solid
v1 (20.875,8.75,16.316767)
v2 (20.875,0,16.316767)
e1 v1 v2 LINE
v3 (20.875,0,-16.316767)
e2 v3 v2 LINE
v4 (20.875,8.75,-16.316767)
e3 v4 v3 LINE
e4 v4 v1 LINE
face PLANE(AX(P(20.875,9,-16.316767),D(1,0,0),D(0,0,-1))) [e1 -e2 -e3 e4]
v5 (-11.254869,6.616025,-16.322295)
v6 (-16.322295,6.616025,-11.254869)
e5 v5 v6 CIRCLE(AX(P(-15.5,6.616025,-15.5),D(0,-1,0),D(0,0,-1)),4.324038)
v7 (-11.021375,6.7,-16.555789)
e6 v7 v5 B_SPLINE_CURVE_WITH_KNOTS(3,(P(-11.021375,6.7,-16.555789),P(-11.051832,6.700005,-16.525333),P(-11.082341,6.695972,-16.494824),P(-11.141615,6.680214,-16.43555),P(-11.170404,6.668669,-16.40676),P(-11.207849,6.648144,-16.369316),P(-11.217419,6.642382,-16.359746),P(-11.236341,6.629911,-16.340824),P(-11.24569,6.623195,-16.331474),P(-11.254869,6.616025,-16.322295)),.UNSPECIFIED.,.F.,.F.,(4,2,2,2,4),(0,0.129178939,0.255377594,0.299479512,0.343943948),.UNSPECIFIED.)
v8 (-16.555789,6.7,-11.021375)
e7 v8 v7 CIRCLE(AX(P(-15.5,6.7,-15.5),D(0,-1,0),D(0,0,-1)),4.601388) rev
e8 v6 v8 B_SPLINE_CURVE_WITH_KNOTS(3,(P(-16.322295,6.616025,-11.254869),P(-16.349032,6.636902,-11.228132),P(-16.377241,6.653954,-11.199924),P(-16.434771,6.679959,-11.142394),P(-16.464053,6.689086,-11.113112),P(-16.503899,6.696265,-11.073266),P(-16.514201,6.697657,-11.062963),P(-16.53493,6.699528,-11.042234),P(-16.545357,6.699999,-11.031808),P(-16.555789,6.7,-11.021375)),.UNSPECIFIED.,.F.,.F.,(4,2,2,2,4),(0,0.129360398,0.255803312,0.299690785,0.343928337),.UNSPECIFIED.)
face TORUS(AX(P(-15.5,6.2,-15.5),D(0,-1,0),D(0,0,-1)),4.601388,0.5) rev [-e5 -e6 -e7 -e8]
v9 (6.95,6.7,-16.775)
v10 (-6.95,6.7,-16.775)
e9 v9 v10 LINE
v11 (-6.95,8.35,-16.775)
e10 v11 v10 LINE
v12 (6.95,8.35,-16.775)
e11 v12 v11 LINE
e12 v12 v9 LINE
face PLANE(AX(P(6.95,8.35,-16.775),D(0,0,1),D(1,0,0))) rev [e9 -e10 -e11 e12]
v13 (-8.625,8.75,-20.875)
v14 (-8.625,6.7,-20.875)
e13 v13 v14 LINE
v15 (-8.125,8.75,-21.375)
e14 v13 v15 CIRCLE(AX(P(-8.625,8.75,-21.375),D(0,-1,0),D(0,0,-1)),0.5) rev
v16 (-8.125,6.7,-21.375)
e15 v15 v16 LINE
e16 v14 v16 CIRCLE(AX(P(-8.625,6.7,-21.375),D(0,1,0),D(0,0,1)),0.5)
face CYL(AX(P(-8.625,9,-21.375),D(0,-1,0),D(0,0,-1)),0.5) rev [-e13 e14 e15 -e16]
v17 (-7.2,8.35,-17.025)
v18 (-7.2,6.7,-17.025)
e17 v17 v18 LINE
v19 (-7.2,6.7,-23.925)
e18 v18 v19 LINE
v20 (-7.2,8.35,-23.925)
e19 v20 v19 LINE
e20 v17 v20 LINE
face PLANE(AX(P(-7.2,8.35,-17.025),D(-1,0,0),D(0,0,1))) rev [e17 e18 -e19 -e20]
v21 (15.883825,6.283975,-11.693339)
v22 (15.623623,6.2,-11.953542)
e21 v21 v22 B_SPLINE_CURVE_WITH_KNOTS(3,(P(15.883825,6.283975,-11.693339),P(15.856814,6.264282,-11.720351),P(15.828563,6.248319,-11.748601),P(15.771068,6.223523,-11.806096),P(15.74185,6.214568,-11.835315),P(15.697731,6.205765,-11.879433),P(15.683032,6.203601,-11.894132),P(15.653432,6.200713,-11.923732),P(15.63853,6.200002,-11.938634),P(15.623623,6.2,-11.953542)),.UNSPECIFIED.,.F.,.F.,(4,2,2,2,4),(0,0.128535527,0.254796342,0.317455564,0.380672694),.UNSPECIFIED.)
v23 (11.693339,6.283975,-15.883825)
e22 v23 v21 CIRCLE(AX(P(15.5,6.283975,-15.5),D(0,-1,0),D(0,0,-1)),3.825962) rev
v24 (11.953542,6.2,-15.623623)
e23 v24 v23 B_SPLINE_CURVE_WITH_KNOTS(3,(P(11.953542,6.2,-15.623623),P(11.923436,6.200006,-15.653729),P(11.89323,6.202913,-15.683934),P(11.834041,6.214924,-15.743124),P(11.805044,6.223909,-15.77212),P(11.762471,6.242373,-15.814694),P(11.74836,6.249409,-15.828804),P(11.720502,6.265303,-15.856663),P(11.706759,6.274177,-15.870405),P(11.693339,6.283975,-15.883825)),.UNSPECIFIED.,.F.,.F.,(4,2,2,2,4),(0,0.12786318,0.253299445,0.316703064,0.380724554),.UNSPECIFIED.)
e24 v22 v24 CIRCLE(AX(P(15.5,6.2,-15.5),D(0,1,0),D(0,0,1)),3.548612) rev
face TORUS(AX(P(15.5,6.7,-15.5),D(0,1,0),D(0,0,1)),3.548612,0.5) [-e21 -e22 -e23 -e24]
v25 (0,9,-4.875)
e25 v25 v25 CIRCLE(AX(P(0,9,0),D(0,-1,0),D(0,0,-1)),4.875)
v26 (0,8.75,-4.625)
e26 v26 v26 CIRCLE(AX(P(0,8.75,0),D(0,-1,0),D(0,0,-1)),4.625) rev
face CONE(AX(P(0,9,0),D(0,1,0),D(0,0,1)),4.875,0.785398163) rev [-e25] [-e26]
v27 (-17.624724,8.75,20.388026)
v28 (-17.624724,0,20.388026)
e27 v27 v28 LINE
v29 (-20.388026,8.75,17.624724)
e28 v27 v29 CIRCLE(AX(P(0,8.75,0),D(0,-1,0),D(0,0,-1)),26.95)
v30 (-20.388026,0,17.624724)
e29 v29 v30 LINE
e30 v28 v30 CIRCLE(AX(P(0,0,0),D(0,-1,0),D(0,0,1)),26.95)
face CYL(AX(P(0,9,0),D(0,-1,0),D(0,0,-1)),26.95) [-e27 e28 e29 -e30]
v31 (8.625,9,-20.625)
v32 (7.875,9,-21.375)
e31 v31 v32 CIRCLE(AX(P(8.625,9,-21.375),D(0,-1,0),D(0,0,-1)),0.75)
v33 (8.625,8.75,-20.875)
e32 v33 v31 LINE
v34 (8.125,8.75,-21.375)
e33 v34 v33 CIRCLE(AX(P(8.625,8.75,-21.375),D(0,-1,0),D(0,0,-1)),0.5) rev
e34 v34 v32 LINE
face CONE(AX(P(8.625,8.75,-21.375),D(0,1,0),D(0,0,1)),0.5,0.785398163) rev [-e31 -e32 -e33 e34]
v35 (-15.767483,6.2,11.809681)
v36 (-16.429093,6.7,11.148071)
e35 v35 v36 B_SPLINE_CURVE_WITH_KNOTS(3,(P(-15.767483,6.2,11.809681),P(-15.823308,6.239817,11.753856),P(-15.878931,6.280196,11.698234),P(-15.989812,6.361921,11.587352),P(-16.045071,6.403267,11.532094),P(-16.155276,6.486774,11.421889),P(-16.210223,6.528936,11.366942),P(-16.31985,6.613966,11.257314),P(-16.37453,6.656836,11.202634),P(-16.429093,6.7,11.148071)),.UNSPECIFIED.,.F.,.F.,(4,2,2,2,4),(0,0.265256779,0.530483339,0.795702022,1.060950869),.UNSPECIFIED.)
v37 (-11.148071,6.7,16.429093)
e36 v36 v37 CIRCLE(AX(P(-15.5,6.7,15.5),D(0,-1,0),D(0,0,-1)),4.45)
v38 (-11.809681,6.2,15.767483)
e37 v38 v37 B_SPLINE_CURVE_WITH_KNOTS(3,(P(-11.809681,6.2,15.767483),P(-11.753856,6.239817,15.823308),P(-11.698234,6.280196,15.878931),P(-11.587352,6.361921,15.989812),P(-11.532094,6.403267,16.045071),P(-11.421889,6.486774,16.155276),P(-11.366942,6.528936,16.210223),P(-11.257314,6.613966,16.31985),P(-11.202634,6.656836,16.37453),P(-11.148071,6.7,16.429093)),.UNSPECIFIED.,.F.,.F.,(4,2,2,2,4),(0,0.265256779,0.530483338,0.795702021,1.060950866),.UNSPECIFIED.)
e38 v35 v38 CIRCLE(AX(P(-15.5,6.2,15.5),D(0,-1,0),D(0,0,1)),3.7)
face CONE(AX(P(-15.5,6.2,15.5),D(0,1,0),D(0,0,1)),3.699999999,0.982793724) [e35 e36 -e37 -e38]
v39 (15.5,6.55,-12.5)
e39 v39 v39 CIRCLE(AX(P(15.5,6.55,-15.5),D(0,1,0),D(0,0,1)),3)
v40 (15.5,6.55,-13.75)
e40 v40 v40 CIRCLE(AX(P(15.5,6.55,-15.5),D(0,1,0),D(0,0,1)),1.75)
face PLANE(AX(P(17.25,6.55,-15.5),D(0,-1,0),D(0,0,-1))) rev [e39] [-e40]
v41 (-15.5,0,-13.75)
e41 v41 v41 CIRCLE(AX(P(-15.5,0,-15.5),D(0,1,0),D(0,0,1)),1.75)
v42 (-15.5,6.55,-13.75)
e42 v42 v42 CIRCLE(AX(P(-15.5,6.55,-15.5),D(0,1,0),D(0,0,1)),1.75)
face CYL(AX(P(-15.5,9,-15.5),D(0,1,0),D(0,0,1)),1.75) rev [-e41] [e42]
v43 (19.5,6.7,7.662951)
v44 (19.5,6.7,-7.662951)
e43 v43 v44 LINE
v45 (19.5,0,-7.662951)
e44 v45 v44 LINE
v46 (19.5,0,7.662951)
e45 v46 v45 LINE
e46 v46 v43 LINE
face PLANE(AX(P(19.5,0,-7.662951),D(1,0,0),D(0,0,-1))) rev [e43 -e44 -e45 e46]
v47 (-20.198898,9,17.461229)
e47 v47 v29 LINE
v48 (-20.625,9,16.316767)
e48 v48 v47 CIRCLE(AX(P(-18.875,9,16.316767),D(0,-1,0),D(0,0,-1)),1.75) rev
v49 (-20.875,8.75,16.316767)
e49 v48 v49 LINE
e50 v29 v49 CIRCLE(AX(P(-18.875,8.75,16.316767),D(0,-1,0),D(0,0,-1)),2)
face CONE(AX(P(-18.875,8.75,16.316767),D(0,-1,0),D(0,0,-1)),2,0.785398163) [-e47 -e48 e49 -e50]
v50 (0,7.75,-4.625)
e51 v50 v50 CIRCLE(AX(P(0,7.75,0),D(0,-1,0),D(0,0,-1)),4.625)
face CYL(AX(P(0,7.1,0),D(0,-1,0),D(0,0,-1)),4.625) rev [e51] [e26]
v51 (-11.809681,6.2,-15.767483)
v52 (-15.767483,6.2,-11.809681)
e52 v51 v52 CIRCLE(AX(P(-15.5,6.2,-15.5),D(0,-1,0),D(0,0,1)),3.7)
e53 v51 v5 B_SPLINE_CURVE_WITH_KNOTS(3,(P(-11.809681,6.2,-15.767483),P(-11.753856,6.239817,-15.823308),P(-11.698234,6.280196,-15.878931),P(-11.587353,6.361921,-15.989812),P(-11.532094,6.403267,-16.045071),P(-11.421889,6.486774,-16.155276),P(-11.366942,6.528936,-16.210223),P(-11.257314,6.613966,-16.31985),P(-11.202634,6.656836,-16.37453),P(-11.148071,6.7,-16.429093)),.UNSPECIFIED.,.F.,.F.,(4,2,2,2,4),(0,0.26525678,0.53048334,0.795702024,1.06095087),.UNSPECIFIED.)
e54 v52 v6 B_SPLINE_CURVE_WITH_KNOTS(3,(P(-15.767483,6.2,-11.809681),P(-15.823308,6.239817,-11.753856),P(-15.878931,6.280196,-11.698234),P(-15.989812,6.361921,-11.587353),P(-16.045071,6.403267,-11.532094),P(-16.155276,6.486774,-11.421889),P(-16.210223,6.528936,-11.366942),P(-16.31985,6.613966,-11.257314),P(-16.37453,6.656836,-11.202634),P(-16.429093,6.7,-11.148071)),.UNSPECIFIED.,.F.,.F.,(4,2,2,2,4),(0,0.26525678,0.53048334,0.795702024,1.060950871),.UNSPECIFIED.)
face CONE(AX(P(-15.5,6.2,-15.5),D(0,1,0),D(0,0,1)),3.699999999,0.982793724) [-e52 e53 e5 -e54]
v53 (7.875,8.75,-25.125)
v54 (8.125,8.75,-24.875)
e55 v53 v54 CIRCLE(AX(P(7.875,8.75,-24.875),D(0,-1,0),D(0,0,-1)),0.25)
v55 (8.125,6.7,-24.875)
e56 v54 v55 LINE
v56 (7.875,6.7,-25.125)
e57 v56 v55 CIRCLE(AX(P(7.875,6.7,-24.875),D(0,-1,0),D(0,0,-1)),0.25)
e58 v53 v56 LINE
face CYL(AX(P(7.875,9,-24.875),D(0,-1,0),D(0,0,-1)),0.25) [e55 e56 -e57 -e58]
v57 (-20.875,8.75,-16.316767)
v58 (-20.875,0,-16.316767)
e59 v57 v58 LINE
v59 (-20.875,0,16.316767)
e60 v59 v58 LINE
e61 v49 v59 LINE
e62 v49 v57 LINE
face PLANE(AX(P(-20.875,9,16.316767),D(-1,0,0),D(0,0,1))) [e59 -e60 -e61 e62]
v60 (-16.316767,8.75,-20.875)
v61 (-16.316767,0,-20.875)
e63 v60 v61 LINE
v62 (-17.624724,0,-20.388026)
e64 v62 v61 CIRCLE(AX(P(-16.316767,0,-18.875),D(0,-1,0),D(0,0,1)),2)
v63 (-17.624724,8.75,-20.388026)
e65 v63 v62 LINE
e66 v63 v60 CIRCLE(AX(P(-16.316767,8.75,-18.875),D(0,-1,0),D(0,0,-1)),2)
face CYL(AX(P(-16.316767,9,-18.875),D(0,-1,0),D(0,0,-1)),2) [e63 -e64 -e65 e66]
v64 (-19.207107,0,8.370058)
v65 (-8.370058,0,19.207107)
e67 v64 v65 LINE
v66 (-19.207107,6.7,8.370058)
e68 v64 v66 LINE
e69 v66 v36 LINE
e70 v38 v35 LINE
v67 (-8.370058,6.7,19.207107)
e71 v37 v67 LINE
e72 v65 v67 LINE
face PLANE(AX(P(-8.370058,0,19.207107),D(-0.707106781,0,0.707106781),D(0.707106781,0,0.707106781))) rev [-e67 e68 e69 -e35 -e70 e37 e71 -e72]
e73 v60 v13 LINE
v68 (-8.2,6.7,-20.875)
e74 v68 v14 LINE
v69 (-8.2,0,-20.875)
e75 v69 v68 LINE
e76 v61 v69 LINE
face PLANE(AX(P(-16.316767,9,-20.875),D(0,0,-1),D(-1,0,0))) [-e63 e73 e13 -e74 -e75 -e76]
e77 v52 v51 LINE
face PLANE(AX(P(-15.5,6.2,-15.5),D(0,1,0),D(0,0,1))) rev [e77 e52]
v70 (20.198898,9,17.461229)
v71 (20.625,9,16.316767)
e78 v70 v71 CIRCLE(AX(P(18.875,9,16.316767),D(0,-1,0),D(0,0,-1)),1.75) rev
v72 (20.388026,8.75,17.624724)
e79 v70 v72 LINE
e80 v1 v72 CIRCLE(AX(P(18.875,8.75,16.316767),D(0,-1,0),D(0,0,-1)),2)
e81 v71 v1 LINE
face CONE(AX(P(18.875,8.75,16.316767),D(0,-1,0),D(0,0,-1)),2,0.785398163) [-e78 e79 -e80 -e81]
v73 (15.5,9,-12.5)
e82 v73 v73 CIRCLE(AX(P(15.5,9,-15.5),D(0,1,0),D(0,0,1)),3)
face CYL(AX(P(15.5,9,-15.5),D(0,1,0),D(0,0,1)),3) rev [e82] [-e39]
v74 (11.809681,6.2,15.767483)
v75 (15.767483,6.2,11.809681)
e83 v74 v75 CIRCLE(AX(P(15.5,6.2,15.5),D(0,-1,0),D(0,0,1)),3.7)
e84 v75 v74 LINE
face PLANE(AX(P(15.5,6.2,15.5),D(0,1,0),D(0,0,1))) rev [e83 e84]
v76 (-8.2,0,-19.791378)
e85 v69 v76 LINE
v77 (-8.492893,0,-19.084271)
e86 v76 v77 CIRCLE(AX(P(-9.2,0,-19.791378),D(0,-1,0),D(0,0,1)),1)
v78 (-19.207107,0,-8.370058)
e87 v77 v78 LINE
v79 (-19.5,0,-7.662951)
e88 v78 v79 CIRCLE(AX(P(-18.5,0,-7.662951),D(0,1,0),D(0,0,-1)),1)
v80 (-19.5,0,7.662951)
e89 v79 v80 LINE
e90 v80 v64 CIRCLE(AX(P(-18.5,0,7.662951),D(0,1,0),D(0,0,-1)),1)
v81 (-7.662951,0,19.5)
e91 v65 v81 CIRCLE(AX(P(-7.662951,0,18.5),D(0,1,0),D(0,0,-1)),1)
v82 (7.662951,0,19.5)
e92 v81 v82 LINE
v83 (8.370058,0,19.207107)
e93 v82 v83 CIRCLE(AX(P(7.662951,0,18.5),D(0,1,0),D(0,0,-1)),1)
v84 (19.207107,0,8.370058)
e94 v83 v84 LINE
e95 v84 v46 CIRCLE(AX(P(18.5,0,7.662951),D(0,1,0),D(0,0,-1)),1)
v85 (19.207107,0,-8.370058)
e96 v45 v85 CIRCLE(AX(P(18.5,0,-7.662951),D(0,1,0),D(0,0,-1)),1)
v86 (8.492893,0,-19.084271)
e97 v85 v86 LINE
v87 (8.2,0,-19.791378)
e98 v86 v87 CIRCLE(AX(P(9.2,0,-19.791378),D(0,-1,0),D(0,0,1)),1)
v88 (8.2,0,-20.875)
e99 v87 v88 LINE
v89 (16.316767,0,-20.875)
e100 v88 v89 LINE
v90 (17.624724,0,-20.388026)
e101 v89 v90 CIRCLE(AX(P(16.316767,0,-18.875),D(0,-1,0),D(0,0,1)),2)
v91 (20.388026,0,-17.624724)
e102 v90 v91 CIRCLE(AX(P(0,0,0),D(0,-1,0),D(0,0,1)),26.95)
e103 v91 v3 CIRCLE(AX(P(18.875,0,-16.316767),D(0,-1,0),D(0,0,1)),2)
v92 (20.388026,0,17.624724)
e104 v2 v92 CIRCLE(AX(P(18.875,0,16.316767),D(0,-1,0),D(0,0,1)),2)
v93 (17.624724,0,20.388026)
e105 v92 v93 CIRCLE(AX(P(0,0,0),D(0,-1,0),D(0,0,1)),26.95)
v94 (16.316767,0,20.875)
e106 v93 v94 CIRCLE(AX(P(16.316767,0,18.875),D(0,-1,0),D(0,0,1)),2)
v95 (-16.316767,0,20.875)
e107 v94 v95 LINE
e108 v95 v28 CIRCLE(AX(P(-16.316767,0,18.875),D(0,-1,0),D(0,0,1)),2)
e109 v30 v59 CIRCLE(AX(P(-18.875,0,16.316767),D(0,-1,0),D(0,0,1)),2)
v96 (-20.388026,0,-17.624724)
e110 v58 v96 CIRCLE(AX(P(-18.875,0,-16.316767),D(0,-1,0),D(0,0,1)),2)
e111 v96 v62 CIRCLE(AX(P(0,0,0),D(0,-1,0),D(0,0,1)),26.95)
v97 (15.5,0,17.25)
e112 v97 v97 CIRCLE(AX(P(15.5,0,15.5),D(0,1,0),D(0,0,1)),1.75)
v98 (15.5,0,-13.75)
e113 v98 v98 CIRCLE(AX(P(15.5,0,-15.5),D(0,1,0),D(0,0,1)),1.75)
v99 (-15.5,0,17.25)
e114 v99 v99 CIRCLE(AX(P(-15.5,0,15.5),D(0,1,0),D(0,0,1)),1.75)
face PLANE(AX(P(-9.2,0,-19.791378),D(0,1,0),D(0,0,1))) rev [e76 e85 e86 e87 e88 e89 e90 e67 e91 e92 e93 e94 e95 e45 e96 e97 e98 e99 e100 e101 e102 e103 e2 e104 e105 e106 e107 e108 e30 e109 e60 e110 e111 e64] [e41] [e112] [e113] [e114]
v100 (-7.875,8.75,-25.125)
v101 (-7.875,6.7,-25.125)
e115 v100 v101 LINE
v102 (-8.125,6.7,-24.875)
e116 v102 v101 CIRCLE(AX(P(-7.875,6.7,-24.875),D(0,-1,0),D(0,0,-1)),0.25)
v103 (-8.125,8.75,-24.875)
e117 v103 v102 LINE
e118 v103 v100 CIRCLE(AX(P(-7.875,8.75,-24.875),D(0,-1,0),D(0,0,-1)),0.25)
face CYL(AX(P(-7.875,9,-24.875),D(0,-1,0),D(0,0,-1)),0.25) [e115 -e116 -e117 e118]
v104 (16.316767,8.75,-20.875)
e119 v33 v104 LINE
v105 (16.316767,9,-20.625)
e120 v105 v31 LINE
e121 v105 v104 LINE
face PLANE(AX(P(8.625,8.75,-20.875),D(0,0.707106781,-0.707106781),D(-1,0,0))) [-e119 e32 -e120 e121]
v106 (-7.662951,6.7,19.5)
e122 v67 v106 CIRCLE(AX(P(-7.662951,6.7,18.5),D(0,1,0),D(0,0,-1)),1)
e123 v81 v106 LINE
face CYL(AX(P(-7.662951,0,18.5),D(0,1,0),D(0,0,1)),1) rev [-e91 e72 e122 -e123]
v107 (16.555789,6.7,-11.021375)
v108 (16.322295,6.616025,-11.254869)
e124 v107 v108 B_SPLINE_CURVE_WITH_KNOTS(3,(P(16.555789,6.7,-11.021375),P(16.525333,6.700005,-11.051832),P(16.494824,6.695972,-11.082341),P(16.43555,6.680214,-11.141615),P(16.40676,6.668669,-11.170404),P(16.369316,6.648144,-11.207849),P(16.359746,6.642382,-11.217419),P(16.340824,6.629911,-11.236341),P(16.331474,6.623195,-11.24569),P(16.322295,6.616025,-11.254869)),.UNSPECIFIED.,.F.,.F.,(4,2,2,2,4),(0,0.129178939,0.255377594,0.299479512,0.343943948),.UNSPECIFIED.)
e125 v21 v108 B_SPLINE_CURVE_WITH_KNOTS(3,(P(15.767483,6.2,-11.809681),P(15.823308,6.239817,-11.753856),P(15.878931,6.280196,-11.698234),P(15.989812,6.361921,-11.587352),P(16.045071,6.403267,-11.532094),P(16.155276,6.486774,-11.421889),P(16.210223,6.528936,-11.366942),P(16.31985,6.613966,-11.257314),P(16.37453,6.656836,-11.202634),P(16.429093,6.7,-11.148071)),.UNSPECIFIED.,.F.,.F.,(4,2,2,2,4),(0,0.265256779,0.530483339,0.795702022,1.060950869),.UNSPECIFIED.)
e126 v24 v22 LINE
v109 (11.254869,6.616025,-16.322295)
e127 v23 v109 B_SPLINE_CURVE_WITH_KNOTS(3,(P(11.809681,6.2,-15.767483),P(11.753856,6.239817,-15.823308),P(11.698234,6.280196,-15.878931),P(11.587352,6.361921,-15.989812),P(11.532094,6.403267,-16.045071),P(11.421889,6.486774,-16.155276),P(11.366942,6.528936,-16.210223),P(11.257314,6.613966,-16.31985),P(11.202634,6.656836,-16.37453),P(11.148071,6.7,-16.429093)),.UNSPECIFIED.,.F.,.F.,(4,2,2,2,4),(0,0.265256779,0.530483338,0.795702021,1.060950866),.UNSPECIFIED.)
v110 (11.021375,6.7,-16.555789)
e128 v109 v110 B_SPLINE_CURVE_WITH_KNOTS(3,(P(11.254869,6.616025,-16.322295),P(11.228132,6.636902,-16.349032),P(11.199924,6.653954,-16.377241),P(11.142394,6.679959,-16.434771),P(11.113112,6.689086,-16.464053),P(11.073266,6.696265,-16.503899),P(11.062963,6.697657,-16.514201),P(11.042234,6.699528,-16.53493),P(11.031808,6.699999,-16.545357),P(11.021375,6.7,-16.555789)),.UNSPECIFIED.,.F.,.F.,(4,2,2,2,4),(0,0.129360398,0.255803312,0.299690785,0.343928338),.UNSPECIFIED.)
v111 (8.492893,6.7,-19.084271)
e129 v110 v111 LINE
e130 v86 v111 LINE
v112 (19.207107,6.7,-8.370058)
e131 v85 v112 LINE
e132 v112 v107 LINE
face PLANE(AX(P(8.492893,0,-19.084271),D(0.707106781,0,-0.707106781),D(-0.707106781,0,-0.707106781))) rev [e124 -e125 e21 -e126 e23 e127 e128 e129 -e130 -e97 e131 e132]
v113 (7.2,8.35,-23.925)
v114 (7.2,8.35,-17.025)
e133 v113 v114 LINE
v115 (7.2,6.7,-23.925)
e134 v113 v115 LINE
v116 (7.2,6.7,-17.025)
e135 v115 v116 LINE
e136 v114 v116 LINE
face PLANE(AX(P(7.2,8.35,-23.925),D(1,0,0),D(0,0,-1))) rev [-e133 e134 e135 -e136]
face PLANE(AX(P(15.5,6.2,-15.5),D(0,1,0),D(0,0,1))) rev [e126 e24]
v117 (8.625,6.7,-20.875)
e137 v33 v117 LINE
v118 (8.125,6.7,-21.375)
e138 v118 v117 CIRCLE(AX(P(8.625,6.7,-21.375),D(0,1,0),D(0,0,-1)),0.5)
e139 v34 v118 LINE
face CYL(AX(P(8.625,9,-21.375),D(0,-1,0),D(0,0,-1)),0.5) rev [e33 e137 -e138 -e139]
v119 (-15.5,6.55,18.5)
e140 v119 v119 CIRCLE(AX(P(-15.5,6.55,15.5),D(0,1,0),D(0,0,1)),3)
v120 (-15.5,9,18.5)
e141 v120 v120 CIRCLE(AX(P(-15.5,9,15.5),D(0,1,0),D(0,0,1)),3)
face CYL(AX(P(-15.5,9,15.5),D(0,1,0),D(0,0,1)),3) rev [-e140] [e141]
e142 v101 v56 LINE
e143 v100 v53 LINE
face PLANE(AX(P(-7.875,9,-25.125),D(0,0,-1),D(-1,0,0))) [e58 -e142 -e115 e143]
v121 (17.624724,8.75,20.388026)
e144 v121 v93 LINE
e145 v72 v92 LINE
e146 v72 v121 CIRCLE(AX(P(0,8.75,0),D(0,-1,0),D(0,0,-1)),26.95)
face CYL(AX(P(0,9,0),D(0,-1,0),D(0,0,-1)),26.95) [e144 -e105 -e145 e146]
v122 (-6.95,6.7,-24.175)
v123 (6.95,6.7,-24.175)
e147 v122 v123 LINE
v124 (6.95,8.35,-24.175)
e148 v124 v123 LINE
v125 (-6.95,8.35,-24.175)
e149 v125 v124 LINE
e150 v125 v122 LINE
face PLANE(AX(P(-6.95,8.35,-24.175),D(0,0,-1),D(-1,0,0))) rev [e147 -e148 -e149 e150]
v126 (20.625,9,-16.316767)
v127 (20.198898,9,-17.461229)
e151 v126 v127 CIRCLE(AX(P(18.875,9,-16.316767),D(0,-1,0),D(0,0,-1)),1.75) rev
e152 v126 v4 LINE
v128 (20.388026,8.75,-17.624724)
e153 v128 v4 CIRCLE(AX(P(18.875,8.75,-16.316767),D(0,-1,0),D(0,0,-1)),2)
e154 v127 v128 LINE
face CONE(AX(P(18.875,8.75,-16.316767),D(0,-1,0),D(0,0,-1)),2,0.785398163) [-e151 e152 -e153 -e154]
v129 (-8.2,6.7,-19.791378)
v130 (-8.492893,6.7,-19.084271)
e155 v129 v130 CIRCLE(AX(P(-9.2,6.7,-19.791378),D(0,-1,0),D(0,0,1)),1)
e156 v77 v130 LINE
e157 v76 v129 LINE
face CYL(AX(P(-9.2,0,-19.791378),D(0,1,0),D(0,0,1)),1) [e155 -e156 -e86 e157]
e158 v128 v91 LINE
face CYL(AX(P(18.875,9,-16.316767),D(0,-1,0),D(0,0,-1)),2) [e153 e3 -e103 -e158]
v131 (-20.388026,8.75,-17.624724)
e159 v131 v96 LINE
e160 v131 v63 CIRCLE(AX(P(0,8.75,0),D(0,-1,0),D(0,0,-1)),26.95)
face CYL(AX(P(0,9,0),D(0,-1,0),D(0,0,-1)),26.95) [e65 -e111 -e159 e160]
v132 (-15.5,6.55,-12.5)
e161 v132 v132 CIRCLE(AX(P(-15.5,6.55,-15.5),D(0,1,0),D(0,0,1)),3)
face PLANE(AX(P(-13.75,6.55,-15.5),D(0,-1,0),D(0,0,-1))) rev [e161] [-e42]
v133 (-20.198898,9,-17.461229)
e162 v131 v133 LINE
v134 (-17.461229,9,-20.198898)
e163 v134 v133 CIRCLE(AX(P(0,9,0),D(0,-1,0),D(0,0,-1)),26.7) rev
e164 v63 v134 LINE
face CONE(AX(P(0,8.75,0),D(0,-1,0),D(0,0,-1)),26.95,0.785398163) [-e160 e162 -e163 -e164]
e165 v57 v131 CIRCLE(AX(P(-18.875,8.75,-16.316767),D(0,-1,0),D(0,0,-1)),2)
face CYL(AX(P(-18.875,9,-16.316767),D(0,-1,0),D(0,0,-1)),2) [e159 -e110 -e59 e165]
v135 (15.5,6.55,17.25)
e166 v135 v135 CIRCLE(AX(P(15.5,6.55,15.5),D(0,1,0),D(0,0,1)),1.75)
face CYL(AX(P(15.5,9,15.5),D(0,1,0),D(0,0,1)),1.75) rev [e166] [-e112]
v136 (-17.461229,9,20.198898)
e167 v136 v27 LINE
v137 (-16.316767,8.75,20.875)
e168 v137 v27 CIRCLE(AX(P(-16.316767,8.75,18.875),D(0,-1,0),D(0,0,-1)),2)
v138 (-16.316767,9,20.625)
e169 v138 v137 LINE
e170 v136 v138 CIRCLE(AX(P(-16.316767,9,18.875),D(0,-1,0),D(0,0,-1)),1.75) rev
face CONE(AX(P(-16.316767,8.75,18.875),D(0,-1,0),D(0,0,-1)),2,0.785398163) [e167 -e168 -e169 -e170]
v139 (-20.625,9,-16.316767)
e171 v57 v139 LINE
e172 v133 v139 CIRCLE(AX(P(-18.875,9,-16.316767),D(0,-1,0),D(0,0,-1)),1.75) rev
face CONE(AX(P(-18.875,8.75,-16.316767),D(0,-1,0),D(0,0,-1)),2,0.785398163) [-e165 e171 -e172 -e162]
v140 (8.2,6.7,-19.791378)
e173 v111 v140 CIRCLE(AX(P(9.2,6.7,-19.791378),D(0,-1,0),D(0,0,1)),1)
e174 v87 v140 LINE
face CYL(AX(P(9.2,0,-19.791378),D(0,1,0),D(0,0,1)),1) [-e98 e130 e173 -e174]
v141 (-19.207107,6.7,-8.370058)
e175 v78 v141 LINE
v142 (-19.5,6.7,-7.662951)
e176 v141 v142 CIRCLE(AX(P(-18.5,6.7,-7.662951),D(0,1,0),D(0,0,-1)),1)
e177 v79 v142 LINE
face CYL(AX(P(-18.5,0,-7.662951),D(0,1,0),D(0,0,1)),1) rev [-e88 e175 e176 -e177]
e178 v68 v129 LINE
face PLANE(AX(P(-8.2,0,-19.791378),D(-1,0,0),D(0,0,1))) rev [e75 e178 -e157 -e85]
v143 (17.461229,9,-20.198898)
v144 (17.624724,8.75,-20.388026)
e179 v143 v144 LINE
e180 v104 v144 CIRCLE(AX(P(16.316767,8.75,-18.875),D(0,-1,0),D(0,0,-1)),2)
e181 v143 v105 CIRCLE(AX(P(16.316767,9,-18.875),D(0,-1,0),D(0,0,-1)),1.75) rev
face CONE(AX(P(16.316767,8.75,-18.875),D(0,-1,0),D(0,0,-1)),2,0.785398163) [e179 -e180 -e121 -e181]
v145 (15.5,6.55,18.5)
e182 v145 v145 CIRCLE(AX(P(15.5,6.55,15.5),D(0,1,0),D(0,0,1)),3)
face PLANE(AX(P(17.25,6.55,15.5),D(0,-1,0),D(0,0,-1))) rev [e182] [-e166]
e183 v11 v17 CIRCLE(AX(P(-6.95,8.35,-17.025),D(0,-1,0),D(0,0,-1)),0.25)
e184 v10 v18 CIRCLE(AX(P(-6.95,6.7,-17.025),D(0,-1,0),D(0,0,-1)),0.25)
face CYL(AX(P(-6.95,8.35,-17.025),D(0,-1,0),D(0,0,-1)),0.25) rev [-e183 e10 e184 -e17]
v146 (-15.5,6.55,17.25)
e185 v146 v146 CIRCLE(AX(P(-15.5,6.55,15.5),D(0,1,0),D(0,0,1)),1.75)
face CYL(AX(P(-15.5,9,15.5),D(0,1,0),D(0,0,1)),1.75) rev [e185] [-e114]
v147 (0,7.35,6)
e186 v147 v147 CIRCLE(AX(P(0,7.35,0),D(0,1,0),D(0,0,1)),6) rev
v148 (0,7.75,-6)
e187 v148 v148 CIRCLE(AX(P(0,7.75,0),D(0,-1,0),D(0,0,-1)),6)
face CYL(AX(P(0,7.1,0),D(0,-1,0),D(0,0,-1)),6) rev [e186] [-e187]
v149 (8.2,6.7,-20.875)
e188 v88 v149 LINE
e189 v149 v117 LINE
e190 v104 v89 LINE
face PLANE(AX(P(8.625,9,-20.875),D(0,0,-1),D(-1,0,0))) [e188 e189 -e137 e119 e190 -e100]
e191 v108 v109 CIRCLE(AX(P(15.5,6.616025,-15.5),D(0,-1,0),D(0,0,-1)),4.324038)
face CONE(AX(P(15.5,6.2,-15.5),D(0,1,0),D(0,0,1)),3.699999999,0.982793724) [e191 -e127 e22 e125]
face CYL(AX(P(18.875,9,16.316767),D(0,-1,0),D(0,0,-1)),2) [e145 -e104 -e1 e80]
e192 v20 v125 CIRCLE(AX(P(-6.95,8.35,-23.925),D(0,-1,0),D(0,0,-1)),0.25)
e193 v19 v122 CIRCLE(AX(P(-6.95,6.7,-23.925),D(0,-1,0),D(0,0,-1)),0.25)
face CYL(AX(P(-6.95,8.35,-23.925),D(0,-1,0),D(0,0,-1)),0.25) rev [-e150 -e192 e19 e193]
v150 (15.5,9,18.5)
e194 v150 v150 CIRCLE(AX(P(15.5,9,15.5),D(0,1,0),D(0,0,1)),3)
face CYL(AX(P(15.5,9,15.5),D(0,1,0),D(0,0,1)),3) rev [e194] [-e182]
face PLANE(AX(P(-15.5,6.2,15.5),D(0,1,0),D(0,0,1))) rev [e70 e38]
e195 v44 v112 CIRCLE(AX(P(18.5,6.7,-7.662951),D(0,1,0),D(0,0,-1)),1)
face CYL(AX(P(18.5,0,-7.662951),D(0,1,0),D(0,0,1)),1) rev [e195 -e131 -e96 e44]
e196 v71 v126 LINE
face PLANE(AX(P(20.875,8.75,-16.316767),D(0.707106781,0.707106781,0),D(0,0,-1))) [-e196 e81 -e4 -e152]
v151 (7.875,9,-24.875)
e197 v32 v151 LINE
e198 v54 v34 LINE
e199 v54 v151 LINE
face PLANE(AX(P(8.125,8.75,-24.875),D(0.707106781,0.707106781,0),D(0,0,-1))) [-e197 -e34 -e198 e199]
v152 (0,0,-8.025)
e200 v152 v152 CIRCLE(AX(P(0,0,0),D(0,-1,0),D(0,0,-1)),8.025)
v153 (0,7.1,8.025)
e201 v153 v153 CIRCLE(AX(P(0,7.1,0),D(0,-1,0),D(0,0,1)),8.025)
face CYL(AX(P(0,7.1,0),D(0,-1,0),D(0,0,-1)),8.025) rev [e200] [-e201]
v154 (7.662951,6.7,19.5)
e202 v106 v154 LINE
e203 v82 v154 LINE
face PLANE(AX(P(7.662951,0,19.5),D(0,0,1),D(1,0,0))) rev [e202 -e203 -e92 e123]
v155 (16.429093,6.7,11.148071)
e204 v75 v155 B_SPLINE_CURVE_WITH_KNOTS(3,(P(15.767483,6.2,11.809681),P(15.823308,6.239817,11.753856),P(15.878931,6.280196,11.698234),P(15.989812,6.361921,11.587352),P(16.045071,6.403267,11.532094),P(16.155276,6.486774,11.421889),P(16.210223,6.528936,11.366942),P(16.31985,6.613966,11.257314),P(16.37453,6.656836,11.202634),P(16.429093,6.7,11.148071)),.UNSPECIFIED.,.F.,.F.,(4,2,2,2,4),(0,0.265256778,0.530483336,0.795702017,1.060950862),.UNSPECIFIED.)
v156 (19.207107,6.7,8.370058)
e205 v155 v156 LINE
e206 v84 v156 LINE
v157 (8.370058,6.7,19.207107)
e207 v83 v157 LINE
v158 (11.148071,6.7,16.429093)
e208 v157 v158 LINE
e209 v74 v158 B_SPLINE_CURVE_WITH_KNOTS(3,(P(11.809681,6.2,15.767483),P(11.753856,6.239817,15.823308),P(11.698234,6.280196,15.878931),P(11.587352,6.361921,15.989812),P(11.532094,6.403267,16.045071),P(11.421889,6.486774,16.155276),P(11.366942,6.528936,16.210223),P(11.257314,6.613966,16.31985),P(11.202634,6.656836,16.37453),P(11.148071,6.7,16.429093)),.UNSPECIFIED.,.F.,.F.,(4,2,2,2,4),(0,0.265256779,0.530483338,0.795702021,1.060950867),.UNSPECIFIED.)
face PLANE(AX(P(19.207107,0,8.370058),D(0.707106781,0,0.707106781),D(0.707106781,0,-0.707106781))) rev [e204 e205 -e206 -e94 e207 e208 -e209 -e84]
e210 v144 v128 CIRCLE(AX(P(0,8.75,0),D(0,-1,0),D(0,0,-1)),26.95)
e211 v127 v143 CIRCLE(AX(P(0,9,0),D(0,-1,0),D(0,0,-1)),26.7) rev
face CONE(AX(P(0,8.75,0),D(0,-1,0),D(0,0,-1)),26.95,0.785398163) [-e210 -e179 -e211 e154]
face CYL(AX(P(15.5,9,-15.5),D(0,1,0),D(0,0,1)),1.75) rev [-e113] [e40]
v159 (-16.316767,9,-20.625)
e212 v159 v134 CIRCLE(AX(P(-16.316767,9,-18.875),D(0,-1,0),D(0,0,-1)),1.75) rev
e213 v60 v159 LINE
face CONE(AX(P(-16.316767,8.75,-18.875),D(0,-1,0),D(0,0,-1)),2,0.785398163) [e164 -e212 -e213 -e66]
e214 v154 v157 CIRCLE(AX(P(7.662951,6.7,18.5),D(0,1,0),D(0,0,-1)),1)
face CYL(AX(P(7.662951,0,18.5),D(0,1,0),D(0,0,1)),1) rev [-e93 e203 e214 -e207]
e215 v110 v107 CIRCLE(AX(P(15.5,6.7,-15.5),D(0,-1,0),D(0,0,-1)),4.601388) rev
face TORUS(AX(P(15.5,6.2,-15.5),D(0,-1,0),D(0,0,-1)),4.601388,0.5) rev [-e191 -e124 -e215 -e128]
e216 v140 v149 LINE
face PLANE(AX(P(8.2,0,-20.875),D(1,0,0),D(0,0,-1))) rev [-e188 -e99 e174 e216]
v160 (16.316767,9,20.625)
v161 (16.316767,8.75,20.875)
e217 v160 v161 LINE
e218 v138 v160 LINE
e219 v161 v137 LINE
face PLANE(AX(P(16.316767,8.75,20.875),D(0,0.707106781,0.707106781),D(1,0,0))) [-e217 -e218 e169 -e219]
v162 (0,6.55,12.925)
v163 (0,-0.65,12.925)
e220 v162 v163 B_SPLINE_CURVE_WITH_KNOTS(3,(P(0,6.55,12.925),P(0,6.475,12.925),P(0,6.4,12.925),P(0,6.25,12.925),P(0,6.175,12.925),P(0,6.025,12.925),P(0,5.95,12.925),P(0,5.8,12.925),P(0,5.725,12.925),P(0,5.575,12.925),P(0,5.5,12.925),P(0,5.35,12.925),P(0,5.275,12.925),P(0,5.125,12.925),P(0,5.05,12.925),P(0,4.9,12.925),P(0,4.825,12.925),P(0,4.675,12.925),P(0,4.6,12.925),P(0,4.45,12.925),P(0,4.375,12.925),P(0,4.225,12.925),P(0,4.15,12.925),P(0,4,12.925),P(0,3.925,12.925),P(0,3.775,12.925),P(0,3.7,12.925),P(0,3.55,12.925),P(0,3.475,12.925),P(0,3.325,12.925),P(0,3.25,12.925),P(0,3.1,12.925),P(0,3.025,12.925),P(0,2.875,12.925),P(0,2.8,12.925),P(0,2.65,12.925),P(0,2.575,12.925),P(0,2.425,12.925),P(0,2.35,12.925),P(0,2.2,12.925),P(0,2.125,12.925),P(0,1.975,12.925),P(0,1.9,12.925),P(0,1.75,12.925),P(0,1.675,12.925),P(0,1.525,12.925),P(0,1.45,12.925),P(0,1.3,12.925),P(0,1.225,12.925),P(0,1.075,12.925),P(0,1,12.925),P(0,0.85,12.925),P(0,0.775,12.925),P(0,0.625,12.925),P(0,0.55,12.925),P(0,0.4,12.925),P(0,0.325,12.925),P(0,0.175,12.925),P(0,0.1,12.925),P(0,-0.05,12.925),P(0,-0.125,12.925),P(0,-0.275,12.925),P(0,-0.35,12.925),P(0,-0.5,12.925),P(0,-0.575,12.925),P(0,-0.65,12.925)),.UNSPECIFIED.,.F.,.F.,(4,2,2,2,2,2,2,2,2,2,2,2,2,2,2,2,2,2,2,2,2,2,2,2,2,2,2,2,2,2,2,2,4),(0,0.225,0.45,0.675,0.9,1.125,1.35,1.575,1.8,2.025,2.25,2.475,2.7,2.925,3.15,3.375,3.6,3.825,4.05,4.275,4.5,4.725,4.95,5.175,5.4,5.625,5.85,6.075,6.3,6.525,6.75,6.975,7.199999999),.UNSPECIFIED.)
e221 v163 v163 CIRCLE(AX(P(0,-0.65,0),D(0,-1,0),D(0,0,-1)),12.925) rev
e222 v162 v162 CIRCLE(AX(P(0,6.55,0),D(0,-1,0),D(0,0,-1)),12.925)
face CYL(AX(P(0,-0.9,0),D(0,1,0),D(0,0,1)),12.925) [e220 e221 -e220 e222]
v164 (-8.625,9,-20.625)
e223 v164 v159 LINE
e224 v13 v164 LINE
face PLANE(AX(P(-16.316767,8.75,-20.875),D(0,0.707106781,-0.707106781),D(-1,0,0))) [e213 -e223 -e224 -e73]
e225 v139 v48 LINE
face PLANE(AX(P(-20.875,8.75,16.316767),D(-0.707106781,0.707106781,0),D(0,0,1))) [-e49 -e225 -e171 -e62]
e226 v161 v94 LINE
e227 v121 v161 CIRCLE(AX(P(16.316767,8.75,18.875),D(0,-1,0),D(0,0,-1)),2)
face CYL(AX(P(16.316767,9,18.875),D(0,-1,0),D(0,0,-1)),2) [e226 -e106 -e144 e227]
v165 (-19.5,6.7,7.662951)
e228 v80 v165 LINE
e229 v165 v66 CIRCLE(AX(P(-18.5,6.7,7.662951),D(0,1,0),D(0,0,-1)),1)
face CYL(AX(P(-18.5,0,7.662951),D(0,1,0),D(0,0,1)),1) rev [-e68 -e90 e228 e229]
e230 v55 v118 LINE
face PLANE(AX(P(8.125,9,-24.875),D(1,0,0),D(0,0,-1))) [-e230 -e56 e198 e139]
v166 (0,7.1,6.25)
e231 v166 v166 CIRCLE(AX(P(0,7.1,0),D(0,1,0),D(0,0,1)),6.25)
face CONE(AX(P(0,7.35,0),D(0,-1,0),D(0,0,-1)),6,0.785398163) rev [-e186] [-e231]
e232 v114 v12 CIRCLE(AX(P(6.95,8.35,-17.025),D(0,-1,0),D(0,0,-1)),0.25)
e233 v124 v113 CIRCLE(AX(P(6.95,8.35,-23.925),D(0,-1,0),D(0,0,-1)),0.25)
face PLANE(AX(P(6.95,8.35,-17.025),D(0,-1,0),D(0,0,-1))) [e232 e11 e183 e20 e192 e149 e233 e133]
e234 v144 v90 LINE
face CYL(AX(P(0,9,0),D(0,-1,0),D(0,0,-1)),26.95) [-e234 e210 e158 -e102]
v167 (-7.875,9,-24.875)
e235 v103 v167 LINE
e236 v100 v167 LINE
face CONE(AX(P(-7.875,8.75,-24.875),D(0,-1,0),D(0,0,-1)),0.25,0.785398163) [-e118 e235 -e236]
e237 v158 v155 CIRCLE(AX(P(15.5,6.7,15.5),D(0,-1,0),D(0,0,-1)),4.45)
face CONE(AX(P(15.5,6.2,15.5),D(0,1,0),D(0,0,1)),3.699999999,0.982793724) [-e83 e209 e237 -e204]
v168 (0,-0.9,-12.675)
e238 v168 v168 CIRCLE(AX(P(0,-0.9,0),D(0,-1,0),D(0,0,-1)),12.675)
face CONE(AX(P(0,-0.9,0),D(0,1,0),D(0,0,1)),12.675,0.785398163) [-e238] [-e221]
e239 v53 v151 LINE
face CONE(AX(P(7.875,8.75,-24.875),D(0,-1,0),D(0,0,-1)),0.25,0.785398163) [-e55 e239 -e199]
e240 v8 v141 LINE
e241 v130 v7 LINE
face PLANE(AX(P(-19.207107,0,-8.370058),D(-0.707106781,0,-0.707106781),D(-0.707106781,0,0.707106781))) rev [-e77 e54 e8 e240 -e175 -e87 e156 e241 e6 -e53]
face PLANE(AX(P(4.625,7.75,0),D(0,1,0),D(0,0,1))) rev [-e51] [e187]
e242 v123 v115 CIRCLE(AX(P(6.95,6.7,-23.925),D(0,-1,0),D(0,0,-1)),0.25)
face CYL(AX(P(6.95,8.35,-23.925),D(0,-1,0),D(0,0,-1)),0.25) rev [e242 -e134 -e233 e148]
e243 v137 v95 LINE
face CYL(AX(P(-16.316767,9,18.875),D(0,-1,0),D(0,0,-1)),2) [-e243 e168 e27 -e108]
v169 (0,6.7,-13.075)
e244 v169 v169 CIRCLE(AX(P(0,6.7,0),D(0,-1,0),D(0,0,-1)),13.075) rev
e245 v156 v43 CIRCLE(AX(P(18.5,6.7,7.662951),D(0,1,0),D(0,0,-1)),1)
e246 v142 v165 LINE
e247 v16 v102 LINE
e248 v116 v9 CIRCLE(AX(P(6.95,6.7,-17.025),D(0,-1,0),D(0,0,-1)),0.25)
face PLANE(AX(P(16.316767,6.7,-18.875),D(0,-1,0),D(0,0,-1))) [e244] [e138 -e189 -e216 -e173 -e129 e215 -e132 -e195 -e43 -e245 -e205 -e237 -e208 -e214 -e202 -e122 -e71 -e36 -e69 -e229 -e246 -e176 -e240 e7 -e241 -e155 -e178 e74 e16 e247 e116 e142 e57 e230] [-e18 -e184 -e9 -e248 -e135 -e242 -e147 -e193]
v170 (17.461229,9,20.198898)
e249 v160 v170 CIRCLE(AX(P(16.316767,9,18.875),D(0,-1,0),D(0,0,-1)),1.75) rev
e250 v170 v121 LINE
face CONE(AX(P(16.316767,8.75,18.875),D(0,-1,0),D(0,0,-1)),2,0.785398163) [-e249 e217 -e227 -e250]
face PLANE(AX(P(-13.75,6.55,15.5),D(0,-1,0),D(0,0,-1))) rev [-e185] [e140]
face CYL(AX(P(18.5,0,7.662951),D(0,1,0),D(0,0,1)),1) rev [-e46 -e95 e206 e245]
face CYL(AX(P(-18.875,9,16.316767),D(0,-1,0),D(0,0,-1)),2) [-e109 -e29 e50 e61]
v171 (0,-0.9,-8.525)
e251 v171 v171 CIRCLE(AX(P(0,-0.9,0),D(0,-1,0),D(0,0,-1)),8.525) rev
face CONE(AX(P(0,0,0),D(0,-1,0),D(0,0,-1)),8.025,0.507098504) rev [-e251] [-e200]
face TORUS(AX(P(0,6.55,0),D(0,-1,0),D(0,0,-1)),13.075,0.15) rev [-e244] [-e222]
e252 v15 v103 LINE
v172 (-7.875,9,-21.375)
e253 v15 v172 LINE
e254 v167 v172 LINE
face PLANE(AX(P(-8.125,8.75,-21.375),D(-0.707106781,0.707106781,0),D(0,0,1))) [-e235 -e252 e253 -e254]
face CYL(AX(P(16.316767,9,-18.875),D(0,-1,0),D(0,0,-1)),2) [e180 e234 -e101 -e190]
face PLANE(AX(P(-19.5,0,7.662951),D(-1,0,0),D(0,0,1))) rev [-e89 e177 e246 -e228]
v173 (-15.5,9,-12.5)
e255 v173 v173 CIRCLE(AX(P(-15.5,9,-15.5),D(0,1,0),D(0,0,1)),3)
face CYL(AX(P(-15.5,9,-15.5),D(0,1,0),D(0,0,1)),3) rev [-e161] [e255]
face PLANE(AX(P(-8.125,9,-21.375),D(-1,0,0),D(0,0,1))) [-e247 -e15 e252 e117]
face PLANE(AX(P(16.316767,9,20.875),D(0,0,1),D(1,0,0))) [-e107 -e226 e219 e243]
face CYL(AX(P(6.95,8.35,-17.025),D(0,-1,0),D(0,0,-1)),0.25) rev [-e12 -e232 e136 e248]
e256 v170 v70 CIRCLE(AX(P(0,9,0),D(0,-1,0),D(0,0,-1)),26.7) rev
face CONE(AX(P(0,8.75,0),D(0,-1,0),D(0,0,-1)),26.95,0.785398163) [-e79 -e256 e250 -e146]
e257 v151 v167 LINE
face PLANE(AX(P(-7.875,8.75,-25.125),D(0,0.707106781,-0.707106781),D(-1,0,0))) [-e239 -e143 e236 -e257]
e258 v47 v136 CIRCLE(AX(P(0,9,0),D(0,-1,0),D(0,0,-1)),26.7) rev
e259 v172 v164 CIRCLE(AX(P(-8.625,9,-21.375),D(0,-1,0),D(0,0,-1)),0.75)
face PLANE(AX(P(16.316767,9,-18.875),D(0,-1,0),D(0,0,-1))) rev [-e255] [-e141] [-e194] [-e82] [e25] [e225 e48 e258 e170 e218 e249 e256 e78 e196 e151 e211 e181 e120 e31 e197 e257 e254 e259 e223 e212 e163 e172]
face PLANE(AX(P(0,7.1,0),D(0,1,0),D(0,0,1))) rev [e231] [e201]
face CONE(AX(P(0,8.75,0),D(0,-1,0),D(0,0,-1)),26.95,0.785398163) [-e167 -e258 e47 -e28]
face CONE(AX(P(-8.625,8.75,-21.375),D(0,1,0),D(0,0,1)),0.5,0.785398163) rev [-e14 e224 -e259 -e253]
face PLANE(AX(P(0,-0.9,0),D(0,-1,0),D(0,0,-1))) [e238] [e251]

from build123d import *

# Parameters (mm, degrees)
BOSS_EXTRUDE1_DEPTH                              = 2.3
BOSS_EXTRUDE2_START                              = 6.7
BOSS_EXTRUDE2_DEPTH                              = 6.7
BOSS_EXTRUDE3_DEPTH                              = 0.5
SKETCH4_R                                        = 12.925
BOSS_EXTRUDE4_DEPTH                              = 7.6
DRAFT1_ANGLE                                     = 56.309932527
DRAFT2_ANGLE                                     = 56.309932527
DRAFT3_ANGLE                                     = 56.309932527
DRAFT4_ANGLE                                     = 56.309932527
SKETCH5_R                                        = 8.025
CUT_EXTRUDE1_DEPTH                               = 8
CUT_EXTRUDE2_DEPTH                               = 1.65
CBORE_FOR_M8_HEX_HEAD_BOLT1_D                    = 9.25
CBORE_FOR_M8_HEX_HEAD_BOLT1_CBORE_D              = 12
CBORE_FOR_M8_HEX_HEAD_BOLT1_CBORE_DEPTH          = 0.65
CBORE_FOR_M3_HEX_HEAD_MACHINE_SCREW1_D           = 3.5
CBORE_FOR_M3_HEX_HEAD_MACHINE_SCREW1_DEPTH       = 9.9
CBORE_FOR_M3_HEX_HEAD_MACHINE_SCREW1_CBORE_D     = 6
CBORE_FOR_M3_HEX_HEAD_MACHINE_SCREW1_CBORE_DEPTH = 2.45
CHAMFER1_SIZE                                    = 0.25
CHAMFER4_SIZE                                    = 0.5
CHAMFER4_SIZE2                                   = 0.9
FILLET1_R                                        = 0.150000001
FILLET2_R                                        = 0.499999999


with BuildPart() as part:
    # Sketch1 → Boss-Extrude1 (new body)
    with BuildSketch(Plane.XZ.offset(-6.7)):
        with BuildLine():
            Line((8.625, -20.875), (16.316766683, -20.875))
            ThreePointArc((16.316766683, -20.875), (17.01460187, -20.749306819), (17.624723932, -20.388026052))
            ThreePointArc((17.624723932, -20.388026052), (19.056527753, -19.056527753), (20.388026052, -17.624723932))
            ThreePointArc((20.388026052, -17.624723932), (20.749306819, -17.01460187), (20.875, -16.316766683))
            Line((20.875, -16.316766683), (20.875, 16.316766683))
            ThreePointArc((20.875, 16.316766683), (20.749306819, 17.01460187), (20.388026052, 17.624723932))
            ThreePointArc((20.388026052, 17.624723932), (19.056527753, 19.056527753), (17.624723932, 20.388026052))
            ThreePointArc((17.624723932, 20.388026052), (17.01460187, 20.749306819), (16.316766683, 20.875))
            Line((16.316766683, 20.875), (-16.316766683, 20.875))
            ThreePointArc((-16.316766683, 20.875), (-17.01460187, 20.749306819), (-17.624723932, 20.388026052))
            ThreePointArc((-17.624723932, 20.388026052), (-19.056527753, 19.056527753), (-20.388026052, 17.624723932))
            ThreePointArc((-20.388026052, 17.624723932), (-20.749306819, 17.01460187), (-20.875, 16.316766683))
            Line((-20.875, 16.316766683), (-20.875, -16.316766683))
            ThreePointArc((-20.875, -16.316766683), (-20.749306819, -17.01460187), (-20.388026052, -17.624723932))
            ThreePointArc((-20.388026052, -17.624723932), (-19.056527753, -19.056527753), (-17.624723932, -20.388026052))
            ThreePointArc((-17.624723932, -20.388026052), (-17.01460187, -20.749306819), (-16.316766683, -20.875))
            Line((-16.316766683, -20.875), (-8.625, -20.875))
            ThreePointArc((-8.625, -20.875), (-8.271446609, -21.02144661), (-8.125, -21.375))
            Line((-8.125, -21.375), (-8.125, -24.875))
            ThreePointArc((-8.125, -24.875), (-8.051776696, -25.051776693), (-7.875000003, -25.124999997))
            Line((-7.875000003, -25.124999997), (7.875000003, -25.124999997))
            ThreePointArc((7.875000003, -25.124999997), (8.051776696, -25.051776693), (8.125, -24.875))
            Line((8.125, -24.875), (8.125, -21.375))
            ThreePointArc((8.125, -21.375), (8.271446609, -21.02144661), (8.625, -20.875))
        make_face()
    extrude(amount=-BOSS_EXTRUDE1_DEPTH)

    # Sketch2 → Boss-Extrude2 (add)
    with BuildSketch(Plane.XZ.offset(-6.7).offset(BOSS_EXTRUDE2_START)):
        with BuildLine():
            Line((-8.2, -19.791378029), (-8.2, -20.875))
            Line((-8.2, -20.875), (-16.316766683, -20.875))
            ThreePointArc((-16.316766683, -20.875), (-17.01460187, -20.749306819), (-17.624723932, -20.388026052))
            ThreePointArc((-17.624723932, -20.388026052), (-19.056527753, -19.056527753), (-20.388026052, -17.624723932))
            ThreePointArc((-20.388026052, -17.624723932), (-20.749306819, -17.01460187), (-20.875, -16.316766683))
            Line((-20.875, -16.316766683), (-20.875, 16.316766683))
            ThreePointArc((-20.875, 16.316766683), (-20.749306819, 17.01460187), (-20.388026052, 17.624723932))
            ThreePointArc((-20.388026052, 17.624723932), (-19.056527753, 19.056527753), (-17.624723932, 20.388026052))
            ThreePointArc((-17.624723932, 20.388026052), (-17.01460187, 20.749306819), (-16.316766683, 20.875))
            Line((-16.316766683, 20.875), (16.316766683, 20.875))
            ThreePointArc((16.316766683, 20.875), (17.01460187, 20.749306819), (17.624723932, 20.388026052))
            ThreePointArc((17.624723932, 20.388026052), (19.056527753, 19.056527753), (20.388026052, 17.624723932))
            ThreePointArc((20.388026052, 17.624723932), (20.749306819, 17.01460187), (20.875, 16.316766683))
            Line((20.875, 16.316766683), (20.875, -16.316766683))
            ThreePointArc((20.875, -16.316766683), (20.749306819, -17.01460187), (20.388026052, -17.624723932))
            ThreePointArc((20.388026052, -17.624723932), (19.056527753, -19.056527753), (17.624723932, -20.388026052))
            ThreePointArc((17.624723932, -20.388026052), (17.01460187, -20.749306819), (16.316766683, -20.875))
            Line((16.316766683, -20.875), (8.199999996, -20.875))
            Line((8.199999996, -20.875), (8.199999996, -19.791378029))
            ThreePointArc((8.199999996, -19.791378029), (8.276120463, -19.408694597), (8.492893215, -19.084271248))
            Line((8.492893215, -19.084271248), (19.207106777, -8.370057685))
            ThreePointArc((19.207106777, -8.370057685), (19.423879528, -8.045634337), (19.499999995, -7.662950906))
            Line((19.499999995, -7.662950906), (19.499999995, 7.662950902))
            ThreePointArc((19.499999995, 7.662950902), (19.423879528, 8.045634333), (19.207106777, 8.370057681))
            Line((19.207106777, 8.370057681), (8.370057681, 19.207106777))
            ThreePointArc((8.370057681, 19.207106777), (8.045634333, 19.423879528), (7.662950902, 19.499999995))
            Line((7.662950902, 19.499999995), (-7.662950906, 19.499999995))
            ThreePointArc((-7.662950906, 19.499999995), (-8.045634337, 19.423879528), (-8.370057685, 19.207106777))
            Line((-8.370057685, 19.207106777), (-19.207106781, 8.370057681))
            ThreePointArc((-19.207106781, 8.370057681), (-19.423879532, 8.045634333), (-19.499999999, 7.662950902))
            Line((-19.499999999, 7.662950902), (-19.499999999, -7.662950906))
            ThreePointArc((-19.499999999, -7.662950906), (-19.423879532, -8.045634337), (-19.207106781, -8.370057685))
            Line((-19.207106781, -8.370057685), (-8.492893219, -19.084271248))
            ThreePointArc((-8.492893219, -19.084271248), (-8.276120467, -19.408694597), (-8.2, -19.791378029))
        make_face()
    extrude(amount=-BOSS_EXTRUDE2_DEPTH)

    # Sketch3 → Boss-Extrude3 (add)
    with BuildSketch(Plane.XZ.offset(-6.7)):
        with BuildLine():
            Line((-11.809681219, -15.767483247), (-15.767483247, -11.809681219))
            ThreePointArc((-15.767483247, -11.809681219), (-12.88370491, -12.88370491), (-11.809681219, -15.767483247))
        make_face()
        with BuildLine():
            Line((-15.767483247, 11.809681219), (-11.809681219, 15.767483247))
            ThreePointArc((-11.809681219, 15.767483247), (-12.88370491, 12.88370491), (-15.767483247, 11.809681219))
        make_face()
        with BuildLine():
            Line((15.767483247, -11.809681219), (11.809681219, -15.767483247))
            ThreePointArc((11.809681219, -15.767483247), (12.88370491, -12.88370491), (15.767483247, -11.809681219))
        make_face()
        with BuildLine():
            Line((11.809681219, 15.767483247), (15.767483247, 11.809681219))
            ThreePointArc((15.767483247, 11.809681219), (12.88370491, 12.88370491), (11.809681219, 15.767483247))
        make_face()
    extrude(amount=BOSS_EXTRUDE3_DEPTH)

    # Sketch4 → Boss-Extrude4 (add)
    with BuildSketch(Plane.XZ.offset(-6.7)):
        with Locations(Location((0, 0, 0), (0, 0, 90))):
            Circle(SKETCH4_R)
    extrude(amount=BOSS_EXTRUDE4_DEPTH)

    # Draft1
    draft1_faces = [part.faces().sort_by_distance(p)[0] for p in [
        (-12.88370491, 6.45, -12.88370491),
    ]]
    draft(draft1_faces, Plane(origin=(-15.5, 6.2, -15.5), x_dir=(0, 0, -1), z_dir=(0, -1, 0)), DRAFT1_ANGLE)

    # Draft2
    draft2_faces = [part.faces().sort_by_distance(p)[0] for p in [
        (-12.88370491, 6.45, 12.88370491),
    ]]
    draft(draft2_faces, Plane(origin=(-15.5, 6.2, 15.5), x_dir=(0, 0, -1), z_dir=(0, -1, 0)), DRAFT2_ANGLE)

    # Draft3
    draft3_faces = [part.faces().sort_by_distance(p)[0] for p in [
        (12.88370491, 6.45, 12.88370491),
    ]]
    draft(draft3_faces, Plane(origin=(15.5, 6.2, 15.5), x_dir=(0, 0, -1), z_dir=(0, -1, 0)), DRAFT3_ANGLE)

    # Draft4
    draft4_faces = [part.faces().sort_by_distance(p)[0] for p in [
        (12.88370491, 6.45, -12.88370491),
    ]]
    draft(draft4_faces, Plane(origin=(15.5, 6.2, -15.5), x_dir=(0, 0, -1), z_dir=(0, -1, 0)), DRAFT4_ANGLE)

    # Sketch5 → Cut-Extrude1 (cut)
    with BuildSketch(Plane.XZ.offset(0.9)):
        with Locations(Location((0, 0, 0), (0, 0, 90))):
            Circle(SKETCH5_R)
    extrude(amount=-CUT_EXTRUDE1_DEPTH, mode=Mode.SUBTRACT)

    # Sketch6 → Cut-Extrude2 (cut)
    with BuildSketch(Plane.XZ.offset(-6.7)):
        with BuildLine():
            Line((6.95, -16.775), (-6.95, -16.775))
            ThreePointArc((-6.95, -16.775), (-7.126776695, -16.848223305), (-7.2, -17.025))
            Line((-7.2, -17.025), (-7.2, -23.925))
            ThreePointArc((-7.2, -23.925), (-7.126776695, -24.101776695), (-6.95, -24.175))
            Line((-6.95, -24.175), (6.95, -24.175))
            ThreePointArc((6.95, -24.175), (7.126776695, -24.101776695), (7.2, -23.925))
            Line((7.2, -23.925), (7.2, -17.025))
            ThreePointArc((7.2, -17.025), (7.126776695, -16.848223305), (6.95, -16.775))
        make_face()
    extrude(amount=-CUT_EXTRUDE2_DEPTH, mode=Mode.SUBTRACT)

    # CBORE for M8 Hex Head Bolt1 (through all)
    with Locations(Plane(origin=(0, 7.1, 0), x_dir=(-1, 0, 0), z_dir=(0, -1, 0))):
        with Locations((0, 0)):
            CounterBoreHole(CBORE_FOR_M8_HEX_HEAD_BOLT1_D / 2, CBORE_FOR_M8_HEX_HEAD_BOLT1_CBORE_D / 2, CBORE_FOR_M8_HEX_HEAD_BOLT1_CBORE_DEPTH)

    # CBORE for M3 Hex Head Machine Screw1
    with Locations(Plane(origin=(0, 9, 0), x_dir=(1, 0, 0), z_dir=(0, 1, 0))):
        with Locations((15.5, 15.5), (15.5, -15.5), (-15.5, 15.5), (-15.5, -15.5)):
            CounterBoreHole(CBORE_FOR_M3_HEX_HEAD_MACHINE_SCREW1_D / 2, CBORE_FOR_M3_HEX_HEAD_MACHINE_SCREW1_CBORE_D / 2, CBORE_FOR_M3_HEX_HEAD_MACHINE_SCREW1_CBORE_DEPTH, depth=CBORE_FOR_M3_HEX_HEAD_MACHINE_SCREW1_DEPTH)

    # Chamfer1
    chamfer1_edges = [part.edges().sort_by_distance(p)[0] for p in [
        (20.749306819, 9, -17.01460187),
        (20.875, 9, 0),
        (20.749306819, 9, 17.01460187),
        (19.056527753, 9, 19.056527753),
        (0, -0.9, -12.925),
        (17.01460187, 9, 20.749306819),
        (6, 7.1, 0),
        (-4.625, 9, 0),
        (0, 9, 20.875),
        (-17.01460187, 9, 20.749306819),
        (-19.056527753, 9, 19.056527753),
        (-20.749306819, 9, 17.01460187),
        (-20.875, 9, 0),
        (17.01460187, 9, -20.749306819),
        (-20.749306819, 9, -17.01460187),
        (-19.056527753, 9, -19.056527753),
        (-17.01460187, 9, -20.749306819),
        (-12.470883342, 9, -20.875),
        (-8.271446609, 9, -21.02144661),
        (-8.125, 9, -23.125),
        (-8.051776696, 9, -25.051776693),
        (0, 9, -25.124999997),
        (8.051776696, 9, -25.051776693),
        (8.125, 9, -23.125),
        (19.056527753, 9, -19.056527753),
        (8.271446609, 9, -21.02144661),
        (12.470883342, 9, -20.875),
    ]]
    chamfer(chamfer1_edges, length=CHAMFER1_SIZE - 0.0001)  # a hair under: the kernel refuses the full size

    # Chamfer4
    chamfer4_edges = [part.edges().sort_by_distance(p)[0] for p in [
        (0, -0.9, -8.025),
    ]]
    chamfer4_side = [part.faces().sort_by_distance(p)[0] for p in [
        (0, -0.9, -12.316594034),
    ]]
    chamfer(chamfer4_edges, length=CHAMFER4_SIZE, length2=CHAMFER4_SIZE2, reference=chamfer4_side[0])

    # Fillet1
    fillet1_edges = [part.edges().sort_by_distance(p)[0] for p in [
        (0, 6.7, -12.925),
    ]]
    fillet(fillet1_edges, radius=FILLET1_R)

    # Fillet2
    fillet2_edges = [part.edges().sort_by_distance(p)[0] for p in [
        (-12.353374823, 6.7, -12.353374823),
        (12.353374823, 6.7, -12.353374823),
        (12.88370491, 6.2, -12.88370491),
    ]]
    fillet(fillet2_edges, radius=FILLET2_R)


solid = part.part
